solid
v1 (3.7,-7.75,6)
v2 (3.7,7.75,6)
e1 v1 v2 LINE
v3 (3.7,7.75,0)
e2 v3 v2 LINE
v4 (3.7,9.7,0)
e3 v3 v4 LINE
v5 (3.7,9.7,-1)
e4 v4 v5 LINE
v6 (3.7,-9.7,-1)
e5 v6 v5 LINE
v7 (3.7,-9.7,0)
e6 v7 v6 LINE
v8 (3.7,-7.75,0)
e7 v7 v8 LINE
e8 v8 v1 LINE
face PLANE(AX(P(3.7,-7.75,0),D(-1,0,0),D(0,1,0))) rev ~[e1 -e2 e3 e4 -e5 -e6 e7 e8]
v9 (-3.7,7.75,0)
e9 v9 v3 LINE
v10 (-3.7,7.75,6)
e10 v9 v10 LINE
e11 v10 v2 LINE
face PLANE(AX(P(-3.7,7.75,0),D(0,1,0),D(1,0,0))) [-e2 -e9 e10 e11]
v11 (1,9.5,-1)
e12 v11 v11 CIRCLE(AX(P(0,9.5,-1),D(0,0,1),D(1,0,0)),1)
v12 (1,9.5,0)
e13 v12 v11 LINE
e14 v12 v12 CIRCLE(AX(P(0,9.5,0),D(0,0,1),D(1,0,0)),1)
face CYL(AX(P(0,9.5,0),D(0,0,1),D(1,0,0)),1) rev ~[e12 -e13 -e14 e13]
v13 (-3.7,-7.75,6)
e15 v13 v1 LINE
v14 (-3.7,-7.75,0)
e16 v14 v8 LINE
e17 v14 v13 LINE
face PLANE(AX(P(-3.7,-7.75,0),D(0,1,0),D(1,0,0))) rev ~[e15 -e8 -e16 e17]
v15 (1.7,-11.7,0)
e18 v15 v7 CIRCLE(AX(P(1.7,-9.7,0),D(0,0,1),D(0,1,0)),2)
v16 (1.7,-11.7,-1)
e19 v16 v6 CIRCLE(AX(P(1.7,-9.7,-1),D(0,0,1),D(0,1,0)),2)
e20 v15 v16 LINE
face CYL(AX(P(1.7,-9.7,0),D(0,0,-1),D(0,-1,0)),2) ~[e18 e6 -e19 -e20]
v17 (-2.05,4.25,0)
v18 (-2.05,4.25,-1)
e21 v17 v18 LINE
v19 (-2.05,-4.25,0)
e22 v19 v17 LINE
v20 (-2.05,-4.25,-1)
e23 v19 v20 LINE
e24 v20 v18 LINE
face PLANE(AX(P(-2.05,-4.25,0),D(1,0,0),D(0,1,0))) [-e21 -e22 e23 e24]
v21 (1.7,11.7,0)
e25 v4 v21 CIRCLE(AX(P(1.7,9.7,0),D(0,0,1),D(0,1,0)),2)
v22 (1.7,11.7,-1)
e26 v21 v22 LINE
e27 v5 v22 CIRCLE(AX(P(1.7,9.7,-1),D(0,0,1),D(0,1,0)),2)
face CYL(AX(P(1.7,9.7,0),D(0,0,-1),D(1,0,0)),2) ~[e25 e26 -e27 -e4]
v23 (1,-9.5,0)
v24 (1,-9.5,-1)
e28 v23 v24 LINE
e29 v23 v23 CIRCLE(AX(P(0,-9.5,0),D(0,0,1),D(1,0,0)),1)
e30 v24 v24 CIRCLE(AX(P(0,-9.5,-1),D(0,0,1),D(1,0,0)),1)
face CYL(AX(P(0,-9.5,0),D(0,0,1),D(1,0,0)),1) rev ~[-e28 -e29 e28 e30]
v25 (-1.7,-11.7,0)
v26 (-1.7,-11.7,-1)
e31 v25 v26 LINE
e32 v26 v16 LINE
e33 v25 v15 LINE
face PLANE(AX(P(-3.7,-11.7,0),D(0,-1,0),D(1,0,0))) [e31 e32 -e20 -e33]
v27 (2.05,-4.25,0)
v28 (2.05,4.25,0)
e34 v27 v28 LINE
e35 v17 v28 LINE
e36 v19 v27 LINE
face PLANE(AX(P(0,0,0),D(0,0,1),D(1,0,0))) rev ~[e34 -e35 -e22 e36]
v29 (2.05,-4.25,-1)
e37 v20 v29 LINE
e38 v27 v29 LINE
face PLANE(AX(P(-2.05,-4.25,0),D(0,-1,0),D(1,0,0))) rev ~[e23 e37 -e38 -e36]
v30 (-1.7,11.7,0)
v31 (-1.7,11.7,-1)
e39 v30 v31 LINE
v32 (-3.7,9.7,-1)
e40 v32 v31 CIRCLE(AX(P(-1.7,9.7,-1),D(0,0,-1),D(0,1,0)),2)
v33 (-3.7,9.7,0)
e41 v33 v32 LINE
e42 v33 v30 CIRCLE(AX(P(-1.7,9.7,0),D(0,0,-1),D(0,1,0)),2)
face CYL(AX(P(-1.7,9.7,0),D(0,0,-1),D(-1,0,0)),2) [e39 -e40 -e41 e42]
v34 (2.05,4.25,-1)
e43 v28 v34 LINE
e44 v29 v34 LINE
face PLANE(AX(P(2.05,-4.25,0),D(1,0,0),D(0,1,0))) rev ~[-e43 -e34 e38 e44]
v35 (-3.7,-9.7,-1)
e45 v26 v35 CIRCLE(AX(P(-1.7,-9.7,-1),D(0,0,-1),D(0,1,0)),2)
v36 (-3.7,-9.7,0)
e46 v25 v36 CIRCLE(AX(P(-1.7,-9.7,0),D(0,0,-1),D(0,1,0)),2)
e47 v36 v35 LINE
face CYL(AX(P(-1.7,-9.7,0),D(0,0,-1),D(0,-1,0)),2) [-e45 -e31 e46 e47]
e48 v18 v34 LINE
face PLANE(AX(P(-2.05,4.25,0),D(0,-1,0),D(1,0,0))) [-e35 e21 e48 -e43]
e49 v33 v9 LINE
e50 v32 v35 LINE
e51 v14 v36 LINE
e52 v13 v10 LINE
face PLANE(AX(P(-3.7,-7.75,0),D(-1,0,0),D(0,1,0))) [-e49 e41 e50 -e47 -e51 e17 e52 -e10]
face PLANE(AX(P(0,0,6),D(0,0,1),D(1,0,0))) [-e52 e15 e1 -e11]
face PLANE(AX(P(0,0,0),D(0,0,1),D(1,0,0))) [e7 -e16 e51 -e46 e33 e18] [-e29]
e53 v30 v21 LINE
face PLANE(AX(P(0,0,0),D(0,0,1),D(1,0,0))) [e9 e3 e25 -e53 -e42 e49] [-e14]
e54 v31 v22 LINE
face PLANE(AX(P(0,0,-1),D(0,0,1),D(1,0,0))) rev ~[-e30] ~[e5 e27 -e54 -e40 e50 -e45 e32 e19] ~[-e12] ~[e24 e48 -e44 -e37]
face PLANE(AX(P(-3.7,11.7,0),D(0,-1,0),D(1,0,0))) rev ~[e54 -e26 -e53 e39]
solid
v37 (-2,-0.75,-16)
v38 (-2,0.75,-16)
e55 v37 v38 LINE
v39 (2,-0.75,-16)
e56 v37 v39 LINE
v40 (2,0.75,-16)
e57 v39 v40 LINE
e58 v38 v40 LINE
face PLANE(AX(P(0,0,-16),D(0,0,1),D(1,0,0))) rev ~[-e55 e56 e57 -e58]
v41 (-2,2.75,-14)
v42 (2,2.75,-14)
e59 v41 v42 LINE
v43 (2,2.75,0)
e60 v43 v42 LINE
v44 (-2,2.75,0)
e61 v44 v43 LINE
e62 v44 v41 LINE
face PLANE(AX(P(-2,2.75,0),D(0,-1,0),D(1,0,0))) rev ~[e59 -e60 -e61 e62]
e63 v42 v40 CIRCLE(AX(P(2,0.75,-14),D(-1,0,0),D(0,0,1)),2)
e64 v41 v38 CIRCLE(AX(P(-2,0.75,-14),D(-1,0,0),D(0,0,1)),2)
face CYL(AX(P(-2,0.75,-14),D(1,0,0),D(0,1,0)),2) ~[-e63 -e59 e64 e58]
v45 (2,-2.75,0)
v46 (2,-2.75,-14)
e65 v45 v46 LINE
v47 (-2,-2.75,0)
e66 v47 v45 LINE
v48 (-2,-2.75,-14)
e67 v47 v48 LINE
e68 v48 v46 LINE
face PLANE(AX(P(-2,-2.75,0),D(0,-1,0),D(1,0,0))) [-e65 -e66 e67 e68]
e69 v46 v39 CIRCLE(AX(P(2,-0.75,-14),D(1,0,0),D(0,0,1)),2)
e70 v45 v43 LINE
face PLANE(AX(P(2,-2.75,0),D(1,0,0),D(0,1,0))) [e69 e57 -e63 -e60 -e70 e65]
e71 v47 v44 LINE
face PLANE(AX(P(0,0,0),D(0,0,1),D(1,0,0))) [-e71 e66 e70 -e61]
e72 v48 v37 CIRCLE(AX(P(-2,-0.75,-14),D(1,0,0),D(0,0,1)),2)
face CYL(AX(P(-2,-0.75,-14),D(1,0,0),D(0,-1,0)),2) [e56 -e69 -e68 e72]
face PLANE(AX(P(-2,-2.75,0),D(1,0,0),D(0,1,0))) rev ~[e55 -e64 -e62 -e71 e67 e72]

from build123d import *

# Parameters (mm, degrees)
F0_W     = 4
F0_H     = 5.5
F1_DEPTH = 16
F0_W_2   = 7.4
F0_H_2   = 15.5
F0_W_3   = 4.1
F0_H_3   = 8.5
F0_H_4   = 3.95
F0_R     = 1
F2_DEPTH = 1
F3_R     = 2
F4_DEPTH = 6
F5_R     = 2


with BuildPart() as f1:
    # F0 (on Top) → F1 (new body)
    with BuildSketch(Plane.XY):
        Rectangle(F0_W, F0_H)
    extrude(amount=-F1_DEPTH)

    # F5
    f5_edges = [f1.edges().sort_by_distance(p)[0] for p in [
        (0, 2.75, -16),
        (0, -2.75, -16),
    ]]
    fillet(f5_edges, radius=F5_R)


with BuildPart() as f2:
    # F0 (on Top) → F2 (new body)
    with BuildSketch(Plane.XY):
        Rectangle(F0_W_2, F0_H_2)
        Rectangle(F0_W_3, F0_H_3, mode=Mode.SUBTRACT)
        with Locations((0, -9.725)):
            Rectangle(F0_W_2, F0_H_4)
        with Locations((0, -9.5)):
            Circle(F0_R, mode=Mode.SUBTRACT)
        with Locations((0, 9.725)):
            Rectangle(F0_W_2, F0_H_4)
        with Locations((0, 9.5)):
            Circle(F0_R, mode=Mode.SUBTRACT)
    extrude(amount=-F2_DEPTH)

    # F3
    f3_edges = [f2.edges().sort_by_distance(p)[0] for p in [
        (3.7, 11.7, -0.5),
        (-3.7, 11.7, -0.5),
        (3.7, -11.7, -0.5),
        (-3.7, -11.7, -0.5),
    ]]
    fillet(f3_edges, radius=F3_R)

    # F0 (on Top) → F4 (join)
    with BuildSketch(Plane.XY):
        Rectangle(F0_W_2, F0_H_2)
        Rectangle(F0_W_3, F0_H_3, mode=Mode.SUBTRACT)
        Rectangle(F0_W_3, F0_H_3)
        Rectangle(F0_W, F0_H, mode=Mode.SUBTRACT)
        Rectangle(F0_W, F0_H)
    extrude(amount=F4_DEPTH)


solid = Compound([f1.part, f2.part])
